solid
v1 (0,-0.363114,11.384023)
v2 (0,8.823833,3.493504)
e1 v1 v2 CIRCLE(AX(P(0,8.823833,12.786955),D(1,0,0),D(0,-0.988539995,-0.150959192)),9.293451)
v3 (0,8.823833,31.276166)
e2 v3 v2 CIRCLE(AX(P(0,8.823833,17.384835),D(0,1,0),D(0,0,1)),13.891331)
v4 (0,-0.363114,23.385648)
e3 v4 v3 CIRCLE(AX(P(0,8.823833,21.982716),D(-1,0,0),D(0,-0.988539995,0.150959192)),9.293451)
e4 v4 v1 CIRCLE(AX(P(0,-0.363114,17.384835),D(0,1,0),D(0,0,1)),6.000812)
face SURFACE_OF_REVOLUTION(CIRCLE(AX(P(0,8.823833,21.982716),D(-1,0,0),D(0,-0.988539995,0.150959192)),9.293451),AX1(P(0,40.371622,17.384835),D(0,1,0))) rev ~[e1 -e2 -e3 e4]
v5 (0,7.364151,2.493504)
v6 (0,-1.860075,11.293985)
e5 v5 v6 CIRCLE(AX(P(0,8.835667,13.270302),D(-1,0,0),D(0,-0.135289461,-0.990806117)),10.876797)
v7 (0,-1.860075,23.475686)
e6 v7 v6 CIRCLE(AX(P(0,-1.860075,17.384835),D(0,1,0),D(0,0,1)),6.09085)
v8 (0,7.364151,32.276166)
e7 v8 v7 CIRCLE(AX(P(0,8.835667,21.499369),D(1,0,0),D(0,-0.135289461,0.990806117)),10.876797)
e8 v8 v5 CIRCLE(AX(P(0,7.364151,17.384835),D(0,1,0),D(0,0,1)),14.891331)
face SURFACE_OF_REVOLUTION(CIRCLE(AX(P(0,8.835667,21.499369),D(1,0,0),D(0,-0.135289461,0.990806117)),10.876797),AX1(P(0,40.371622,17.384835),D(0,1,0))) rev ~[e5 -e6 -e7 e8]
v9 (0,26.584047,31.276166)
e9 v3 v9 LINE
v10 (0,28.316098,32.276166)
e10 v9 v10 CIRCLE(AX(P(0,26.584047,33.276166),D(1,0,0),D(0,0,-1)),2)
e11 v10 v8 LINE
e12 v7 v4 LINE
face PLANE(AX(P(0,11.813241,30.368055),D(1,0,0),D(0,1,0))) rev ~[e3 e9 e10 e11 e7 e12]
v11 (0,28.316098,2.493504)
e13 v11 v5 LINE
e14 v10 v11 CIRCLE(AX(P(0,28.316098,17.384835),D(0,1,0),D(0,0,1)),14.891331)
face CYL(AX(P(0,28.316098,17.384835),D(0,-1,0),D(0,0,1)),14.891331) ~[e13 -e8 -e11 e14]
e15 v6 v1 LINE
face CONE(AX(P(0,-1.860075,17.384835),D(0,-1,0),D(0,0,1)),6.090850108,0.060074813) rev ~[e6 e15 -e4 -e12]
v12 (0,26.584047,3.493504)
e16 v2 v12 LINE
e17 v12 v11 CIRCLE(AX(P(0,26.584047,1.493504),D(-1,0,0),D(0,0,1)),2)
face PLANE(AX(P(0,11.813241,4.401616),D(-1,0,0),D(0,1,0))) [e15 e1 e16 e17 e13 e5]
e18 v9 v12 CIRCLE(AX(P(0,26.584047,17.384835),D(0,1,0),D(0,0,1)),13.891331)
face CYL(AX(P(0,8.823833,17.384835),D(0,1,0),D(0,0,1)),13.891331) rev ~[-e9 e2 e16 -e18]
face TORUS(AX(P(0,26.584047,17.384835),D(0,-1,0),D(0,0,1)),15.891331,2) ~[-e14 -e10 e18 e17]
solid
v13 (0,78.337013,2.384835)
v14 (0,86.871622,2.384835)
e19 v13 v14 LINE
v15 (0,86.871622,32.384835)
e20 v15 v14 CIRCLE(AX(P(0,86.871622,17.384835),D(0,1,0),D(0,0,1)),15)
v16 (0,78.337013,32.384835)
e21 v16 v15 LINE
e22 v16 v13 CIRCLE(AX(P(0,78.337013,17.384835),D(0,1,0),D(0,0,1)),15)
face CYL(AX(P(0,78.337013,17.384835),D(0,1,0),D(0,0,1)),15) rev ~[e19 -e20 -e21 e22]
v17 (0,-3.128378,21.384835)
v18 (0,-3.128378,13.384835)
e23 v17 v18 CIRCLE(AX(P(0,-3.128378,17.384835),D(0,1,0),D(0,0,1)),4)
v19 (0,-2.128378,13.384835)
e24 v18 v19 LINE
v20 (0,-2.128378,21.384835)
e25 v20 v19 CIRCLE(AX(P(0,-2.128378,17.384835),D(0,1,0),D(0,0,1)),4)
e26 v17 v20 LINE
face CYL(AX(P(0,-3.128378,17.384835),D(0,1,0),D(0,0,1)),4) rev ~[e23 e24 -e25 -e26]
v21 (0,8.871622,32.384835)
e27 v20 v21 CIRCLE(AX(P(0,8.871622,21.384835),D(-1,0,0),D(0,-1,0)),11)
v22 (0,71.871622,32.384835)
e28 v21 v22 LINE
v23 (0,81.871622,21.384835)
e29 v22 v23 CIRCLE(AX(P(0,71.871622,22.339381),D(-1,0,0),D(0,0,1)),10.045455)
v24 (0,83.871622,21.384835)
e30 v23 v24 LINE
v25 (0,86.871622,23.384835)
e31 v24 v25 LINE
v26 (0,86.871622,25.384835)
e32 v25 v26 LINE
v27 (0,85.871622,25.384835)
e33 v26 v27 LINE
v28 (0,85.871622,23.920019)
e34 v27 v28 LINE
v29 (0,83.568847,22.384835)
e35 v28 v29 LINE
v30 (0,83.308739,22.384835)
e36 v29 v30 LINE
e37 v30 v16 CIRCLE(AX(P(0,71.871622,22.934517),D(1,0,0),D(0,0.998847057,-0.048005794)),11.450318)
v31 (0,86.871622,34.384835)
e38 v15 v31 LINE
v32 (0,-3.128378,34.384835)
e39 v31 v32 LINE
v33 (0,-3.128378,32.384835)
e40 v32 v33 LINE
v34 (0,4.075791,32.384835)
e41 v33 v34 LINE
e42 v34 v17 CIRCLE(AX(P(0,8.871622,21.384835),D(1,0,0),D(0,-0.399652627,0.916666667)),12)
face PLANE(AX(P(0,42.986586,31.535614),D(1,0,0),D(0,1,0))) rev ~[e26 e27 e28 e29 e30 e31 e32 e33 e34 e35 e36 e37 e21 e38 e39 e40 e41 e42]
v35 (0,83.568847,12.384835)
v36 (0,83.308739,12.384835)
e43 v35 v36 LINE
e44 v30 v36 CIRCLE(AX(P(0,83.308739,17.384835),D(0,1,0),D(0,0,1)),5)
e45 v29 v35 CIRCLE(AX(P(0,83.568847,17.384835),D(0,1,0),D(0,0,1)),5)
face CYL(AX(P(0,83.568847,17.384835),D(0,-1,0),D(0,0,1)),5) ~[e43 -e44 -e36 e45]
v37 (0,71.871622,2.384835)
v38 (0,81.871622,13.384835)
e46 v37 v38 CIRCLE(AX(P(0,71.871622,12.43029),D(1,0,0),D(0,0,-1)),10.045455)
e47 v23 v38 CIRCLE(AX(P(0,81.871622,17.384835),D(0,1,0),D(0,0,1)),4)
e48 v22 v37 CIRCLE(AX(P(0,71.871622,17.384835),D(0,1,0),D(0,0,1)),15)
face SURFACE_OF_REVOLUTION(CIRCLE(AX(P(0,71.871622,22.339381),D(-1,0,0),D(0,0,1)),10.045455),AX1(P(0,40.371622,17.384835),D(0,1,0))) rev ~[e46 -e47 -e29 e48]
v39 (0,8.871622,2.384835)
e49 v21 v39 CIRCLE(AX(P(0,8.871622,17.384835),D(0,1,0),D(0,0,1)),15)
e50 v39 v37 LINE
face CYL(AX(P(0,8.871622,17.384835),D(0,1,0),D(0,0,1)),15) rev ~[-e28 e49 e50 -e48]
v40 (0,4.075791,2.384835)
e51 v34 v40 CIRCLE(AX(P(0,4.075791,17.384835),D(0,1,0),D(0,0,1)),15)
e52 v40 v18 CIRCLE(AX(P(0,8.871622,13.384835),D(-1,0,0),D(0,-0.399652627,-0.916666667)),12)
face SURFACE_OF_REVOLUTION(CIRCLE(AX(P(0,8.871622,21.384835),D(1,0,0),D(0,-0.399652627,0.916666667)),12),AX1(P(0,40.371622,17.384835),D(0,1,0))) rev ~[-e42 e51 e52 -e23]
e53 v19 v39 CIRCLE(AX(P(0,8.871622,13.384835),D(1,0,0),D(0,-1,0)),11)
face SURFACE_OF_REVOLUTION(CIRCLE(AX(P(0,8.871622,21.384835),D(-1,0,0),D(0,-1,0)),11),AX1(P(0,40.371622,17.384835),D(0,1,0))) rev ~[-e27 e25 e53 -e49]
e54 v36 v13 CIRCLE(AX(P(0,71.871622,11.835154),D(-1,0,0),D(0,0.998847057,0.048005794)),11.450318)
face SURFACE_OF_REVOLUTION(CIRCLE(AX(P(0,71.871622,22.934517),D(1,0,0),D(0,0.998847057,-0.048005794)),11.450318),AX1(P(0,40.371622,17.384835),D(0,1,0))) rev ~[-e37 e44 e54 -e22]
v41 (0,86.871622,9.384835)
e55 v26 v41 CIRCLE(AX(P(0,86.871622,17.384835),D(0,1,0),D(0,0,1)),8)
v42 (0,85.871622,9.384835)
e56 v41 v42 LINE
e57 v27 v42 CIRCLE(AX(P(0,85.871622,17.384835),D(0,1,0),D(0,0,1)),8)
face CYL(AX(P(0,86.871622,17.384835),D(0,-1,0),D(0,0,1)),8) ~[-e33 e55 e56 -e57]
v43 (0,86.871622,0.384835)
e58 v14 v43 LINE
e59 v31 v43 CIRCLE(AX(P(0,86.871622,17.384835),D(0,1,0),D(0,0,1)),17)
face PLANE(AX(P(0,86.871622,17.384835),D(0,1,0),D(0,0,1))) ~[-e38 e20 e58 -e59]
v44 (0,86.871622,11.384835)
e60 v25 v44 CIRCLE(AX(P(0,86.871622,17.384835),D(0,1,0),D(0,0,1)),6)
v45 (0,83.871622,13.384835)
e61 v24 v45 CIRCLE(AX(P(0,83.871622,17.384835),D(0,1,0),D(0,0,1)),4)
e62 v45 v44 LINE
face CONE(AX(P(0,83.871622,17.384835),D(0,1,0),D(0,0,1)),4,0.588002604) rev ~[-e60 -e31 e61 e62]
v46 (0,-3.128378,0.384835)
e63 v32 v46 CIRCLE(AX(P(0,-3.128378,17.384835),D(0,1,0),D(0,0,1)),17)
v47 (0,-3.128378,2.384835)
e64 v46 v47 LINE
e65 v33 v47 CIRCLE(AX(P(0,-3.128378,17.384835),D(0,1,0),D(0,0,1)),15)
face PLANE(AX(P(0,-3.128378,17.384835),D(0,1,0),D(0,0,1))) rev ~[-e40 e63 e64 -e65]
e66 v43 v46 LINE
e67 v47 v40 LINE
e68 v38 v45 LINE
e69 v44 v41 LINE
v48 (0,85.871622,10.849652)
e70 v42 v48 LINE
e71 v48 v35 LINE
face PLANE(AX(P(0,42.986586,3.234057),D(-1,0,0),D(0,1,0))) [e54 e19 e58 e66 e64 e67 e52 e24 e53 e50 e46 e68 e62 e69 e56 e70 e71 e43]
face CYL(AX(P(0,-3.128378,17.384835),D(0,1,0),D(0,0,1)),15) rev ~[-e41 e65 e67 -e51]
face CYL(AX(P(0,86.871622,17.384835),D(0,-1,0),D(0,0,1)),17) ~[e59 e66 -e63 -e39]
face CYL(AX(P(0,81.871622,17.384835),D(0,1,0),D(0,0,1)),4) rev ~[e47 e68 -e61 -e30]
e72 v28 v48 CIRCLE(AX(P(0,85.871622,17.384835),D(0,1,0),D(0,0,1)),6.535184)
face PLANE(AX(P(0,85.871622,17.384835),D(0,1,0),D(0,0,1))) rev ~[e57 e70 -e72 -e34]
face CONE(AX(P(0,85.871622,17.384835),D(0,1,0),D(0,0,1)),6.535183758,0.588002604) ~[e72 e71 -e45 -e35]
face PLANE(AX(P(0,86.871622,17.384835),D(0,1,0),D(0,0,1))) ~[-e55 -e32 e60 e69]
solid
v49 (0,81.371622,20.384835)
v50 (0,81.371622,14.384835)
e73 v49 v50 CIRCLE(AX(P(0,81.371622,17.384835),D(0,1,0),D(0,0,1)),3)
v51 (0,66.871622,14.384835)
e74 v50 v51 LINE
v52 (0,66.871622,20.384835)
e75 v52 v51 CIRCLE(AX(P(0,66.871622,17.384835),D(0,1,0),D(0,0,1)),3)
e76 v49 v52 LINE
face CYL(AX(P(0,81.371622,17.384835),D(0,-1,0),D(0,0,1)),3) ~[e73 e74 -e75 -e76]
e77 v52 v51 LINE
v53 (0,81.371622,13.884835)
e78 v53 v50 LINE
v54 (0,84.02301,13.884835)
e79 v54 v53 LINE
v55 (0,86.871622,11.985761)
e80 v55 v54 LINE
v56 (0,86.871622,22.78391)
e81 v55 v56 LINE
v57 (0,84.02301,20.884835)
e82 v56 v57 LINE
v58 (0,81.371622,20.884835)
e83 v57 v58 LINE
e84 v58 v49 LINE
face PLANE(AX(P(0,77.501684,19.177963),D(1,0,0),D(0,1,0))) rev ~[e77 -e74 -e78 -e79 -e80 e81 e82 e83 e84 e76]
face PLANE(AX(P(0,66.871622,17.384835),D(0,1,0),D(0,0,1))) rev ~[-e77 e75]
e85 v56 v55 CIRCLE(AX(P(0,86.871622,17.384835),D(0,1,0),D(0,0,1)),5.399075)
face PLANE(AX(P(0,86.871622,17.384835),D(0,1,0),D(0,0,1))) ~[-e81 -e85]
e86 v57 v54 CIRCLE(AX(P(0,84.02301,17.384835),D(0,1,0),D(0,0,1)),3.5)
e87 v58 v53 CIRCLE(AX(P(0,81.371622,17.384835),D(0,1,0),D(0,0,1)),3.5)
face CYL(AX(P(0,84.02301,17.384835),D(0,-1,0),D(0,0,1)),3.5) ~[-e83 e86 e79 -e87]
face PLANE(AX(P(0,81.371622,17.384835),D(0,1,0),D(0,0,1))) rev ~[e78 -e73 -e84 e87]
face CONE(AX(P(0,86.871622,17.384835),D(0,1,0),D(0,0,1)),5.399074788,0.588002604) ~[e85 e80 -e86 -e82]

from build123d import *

# Parameters (mm, degrees)
F1_ANGLE = 180
F3_ANGLE = 180
F5_ANGLE = 180


# Not quite as in the source:
# - a feature names something its author has since deleted; it is built from what else it names


with BuildPart() as f1:
    # F0 (on Right) → F1 (revolve)
    with BuildSketch(Plane.YZ):
        with BuildLine():
            Line((86.8716222048, 34.384835436), (-3.1283777952, 34.384835436))
            Line((-3.1283777952, 34.384835436), (-3.1283777952, 32.384835436))
            Line((-3.1283777952, 32.384835436), (4.0757906815, 32.384835436))
            ThreePointArc((4.0757906815, 32.384835436), (-1.1670524657, 27.9594084914), (-3.1283777952, 21.384835436))
            Line((-3.1283777952, 21.384835436), (-2.1283777952, 21.384835436))
            ThreePointArc((-2.1283777952, 21.384835436), (1.0934476117, 29.1630100291), (8.8716222048, 32.384835436))
            Line((8.8716222048, 32.384835436), (71.8716222048, 32.384835436))
            ThreePointArc((71.8716222048, 32.384835436), (79.3046565784, 29.0966848666), (81.8716222048, 21.384835436))
            Line((81.8716222048, 21.384835436), (83.8716222048, 21.384835436))
            Line((83.8716222048, 21.384835436), (86.8716222048, 23.384835436))
            Line((86.8716222048, 23.384835436), (86.8716222048, 25.384835436))
            Line((86.8716222048, 25.384835436), (85.8716222048, 25.384835436))
            Line((85.8716222048, 25.384835436), (85.8716222048, 23.9200191945))
            Line((85.8716222048, 23.9200191945), (83.568846567, 22.384835436))
            Line((83.568846567, 22.384835436), (83.308739016, 22.384835436))
            ThreePointArc((83.308739016, 22.384835436), (82.1246676761, 28.0320507224), (78.337012641, 32.384835436))
            Line((78.337012641, 32.384835436), (86.8716222048, 32.384835436))
            Line((86.8716222048, 32.384835436), (86.8716222048, 34.384835436))
        make_face()
    revolve(axis=Axis((0, 40.3716222048, 17.384835436), (0, 1, 0)), revolution_arc=F1_ANGLE)


with BuildPart() as f3:
    # F2 (on Right) → F3 (revolve)
    with BuildSketch(Plane.YZ):
        with BuildLine():
            ThreePointArc((26.5840469152, 31.2761664331), (27.5840469152, 31.5441156255), (28.3160977227, 32.2761664331))
            Line((28.3160977227, 32.2761664331), (7.3641507709, 32.2761664331))
            ThreePointArc((7.3641507709, 32.2761664331), (1.3274941354, 29.3690617963), (-1.8600750098, 23.4756855441))
            Line((-1.8600750098, 23.4756855441), (-0.3631143027, 23.385647569))
            ThreePointArc((-0.3631143027, 23.385647569), (2.7686641904, 29.0327619647), (8.8238333804, 31.2761664331))
            Line((8.8238333804, 31.2761664331), (26.5840469152, 31.2761664331))
        make_face()
    revolve(axis=Axis((0, 40.3716222048, 17.384835436), (0, 1, 0)), revolution_arc=F3_ANGLE)


with BuildPart() as f5:
    # F4 (on Right) → F5 (revolve)
    with BuildSketch(Plane.YZ):
        Polygon((86.8716222048, 17.384835436), (86.8716222048, 22.7839102235), (84.0230100236, 20.884835436), (81.3716222048, 20.884835436), (81.3716222048, 20.384835436), (66.8716222048, 20.384835436), (66.8716222048, 17.384835436), (71.8716222048, 17.384835436), align=None)
    revolve(axis=Axis((0, 40.3716222048, 17.384835436), (0, 1, 0)), revolution_arc=F5_ANGLE)


solid = Compound([f1.part, f3.part, f5.part])
